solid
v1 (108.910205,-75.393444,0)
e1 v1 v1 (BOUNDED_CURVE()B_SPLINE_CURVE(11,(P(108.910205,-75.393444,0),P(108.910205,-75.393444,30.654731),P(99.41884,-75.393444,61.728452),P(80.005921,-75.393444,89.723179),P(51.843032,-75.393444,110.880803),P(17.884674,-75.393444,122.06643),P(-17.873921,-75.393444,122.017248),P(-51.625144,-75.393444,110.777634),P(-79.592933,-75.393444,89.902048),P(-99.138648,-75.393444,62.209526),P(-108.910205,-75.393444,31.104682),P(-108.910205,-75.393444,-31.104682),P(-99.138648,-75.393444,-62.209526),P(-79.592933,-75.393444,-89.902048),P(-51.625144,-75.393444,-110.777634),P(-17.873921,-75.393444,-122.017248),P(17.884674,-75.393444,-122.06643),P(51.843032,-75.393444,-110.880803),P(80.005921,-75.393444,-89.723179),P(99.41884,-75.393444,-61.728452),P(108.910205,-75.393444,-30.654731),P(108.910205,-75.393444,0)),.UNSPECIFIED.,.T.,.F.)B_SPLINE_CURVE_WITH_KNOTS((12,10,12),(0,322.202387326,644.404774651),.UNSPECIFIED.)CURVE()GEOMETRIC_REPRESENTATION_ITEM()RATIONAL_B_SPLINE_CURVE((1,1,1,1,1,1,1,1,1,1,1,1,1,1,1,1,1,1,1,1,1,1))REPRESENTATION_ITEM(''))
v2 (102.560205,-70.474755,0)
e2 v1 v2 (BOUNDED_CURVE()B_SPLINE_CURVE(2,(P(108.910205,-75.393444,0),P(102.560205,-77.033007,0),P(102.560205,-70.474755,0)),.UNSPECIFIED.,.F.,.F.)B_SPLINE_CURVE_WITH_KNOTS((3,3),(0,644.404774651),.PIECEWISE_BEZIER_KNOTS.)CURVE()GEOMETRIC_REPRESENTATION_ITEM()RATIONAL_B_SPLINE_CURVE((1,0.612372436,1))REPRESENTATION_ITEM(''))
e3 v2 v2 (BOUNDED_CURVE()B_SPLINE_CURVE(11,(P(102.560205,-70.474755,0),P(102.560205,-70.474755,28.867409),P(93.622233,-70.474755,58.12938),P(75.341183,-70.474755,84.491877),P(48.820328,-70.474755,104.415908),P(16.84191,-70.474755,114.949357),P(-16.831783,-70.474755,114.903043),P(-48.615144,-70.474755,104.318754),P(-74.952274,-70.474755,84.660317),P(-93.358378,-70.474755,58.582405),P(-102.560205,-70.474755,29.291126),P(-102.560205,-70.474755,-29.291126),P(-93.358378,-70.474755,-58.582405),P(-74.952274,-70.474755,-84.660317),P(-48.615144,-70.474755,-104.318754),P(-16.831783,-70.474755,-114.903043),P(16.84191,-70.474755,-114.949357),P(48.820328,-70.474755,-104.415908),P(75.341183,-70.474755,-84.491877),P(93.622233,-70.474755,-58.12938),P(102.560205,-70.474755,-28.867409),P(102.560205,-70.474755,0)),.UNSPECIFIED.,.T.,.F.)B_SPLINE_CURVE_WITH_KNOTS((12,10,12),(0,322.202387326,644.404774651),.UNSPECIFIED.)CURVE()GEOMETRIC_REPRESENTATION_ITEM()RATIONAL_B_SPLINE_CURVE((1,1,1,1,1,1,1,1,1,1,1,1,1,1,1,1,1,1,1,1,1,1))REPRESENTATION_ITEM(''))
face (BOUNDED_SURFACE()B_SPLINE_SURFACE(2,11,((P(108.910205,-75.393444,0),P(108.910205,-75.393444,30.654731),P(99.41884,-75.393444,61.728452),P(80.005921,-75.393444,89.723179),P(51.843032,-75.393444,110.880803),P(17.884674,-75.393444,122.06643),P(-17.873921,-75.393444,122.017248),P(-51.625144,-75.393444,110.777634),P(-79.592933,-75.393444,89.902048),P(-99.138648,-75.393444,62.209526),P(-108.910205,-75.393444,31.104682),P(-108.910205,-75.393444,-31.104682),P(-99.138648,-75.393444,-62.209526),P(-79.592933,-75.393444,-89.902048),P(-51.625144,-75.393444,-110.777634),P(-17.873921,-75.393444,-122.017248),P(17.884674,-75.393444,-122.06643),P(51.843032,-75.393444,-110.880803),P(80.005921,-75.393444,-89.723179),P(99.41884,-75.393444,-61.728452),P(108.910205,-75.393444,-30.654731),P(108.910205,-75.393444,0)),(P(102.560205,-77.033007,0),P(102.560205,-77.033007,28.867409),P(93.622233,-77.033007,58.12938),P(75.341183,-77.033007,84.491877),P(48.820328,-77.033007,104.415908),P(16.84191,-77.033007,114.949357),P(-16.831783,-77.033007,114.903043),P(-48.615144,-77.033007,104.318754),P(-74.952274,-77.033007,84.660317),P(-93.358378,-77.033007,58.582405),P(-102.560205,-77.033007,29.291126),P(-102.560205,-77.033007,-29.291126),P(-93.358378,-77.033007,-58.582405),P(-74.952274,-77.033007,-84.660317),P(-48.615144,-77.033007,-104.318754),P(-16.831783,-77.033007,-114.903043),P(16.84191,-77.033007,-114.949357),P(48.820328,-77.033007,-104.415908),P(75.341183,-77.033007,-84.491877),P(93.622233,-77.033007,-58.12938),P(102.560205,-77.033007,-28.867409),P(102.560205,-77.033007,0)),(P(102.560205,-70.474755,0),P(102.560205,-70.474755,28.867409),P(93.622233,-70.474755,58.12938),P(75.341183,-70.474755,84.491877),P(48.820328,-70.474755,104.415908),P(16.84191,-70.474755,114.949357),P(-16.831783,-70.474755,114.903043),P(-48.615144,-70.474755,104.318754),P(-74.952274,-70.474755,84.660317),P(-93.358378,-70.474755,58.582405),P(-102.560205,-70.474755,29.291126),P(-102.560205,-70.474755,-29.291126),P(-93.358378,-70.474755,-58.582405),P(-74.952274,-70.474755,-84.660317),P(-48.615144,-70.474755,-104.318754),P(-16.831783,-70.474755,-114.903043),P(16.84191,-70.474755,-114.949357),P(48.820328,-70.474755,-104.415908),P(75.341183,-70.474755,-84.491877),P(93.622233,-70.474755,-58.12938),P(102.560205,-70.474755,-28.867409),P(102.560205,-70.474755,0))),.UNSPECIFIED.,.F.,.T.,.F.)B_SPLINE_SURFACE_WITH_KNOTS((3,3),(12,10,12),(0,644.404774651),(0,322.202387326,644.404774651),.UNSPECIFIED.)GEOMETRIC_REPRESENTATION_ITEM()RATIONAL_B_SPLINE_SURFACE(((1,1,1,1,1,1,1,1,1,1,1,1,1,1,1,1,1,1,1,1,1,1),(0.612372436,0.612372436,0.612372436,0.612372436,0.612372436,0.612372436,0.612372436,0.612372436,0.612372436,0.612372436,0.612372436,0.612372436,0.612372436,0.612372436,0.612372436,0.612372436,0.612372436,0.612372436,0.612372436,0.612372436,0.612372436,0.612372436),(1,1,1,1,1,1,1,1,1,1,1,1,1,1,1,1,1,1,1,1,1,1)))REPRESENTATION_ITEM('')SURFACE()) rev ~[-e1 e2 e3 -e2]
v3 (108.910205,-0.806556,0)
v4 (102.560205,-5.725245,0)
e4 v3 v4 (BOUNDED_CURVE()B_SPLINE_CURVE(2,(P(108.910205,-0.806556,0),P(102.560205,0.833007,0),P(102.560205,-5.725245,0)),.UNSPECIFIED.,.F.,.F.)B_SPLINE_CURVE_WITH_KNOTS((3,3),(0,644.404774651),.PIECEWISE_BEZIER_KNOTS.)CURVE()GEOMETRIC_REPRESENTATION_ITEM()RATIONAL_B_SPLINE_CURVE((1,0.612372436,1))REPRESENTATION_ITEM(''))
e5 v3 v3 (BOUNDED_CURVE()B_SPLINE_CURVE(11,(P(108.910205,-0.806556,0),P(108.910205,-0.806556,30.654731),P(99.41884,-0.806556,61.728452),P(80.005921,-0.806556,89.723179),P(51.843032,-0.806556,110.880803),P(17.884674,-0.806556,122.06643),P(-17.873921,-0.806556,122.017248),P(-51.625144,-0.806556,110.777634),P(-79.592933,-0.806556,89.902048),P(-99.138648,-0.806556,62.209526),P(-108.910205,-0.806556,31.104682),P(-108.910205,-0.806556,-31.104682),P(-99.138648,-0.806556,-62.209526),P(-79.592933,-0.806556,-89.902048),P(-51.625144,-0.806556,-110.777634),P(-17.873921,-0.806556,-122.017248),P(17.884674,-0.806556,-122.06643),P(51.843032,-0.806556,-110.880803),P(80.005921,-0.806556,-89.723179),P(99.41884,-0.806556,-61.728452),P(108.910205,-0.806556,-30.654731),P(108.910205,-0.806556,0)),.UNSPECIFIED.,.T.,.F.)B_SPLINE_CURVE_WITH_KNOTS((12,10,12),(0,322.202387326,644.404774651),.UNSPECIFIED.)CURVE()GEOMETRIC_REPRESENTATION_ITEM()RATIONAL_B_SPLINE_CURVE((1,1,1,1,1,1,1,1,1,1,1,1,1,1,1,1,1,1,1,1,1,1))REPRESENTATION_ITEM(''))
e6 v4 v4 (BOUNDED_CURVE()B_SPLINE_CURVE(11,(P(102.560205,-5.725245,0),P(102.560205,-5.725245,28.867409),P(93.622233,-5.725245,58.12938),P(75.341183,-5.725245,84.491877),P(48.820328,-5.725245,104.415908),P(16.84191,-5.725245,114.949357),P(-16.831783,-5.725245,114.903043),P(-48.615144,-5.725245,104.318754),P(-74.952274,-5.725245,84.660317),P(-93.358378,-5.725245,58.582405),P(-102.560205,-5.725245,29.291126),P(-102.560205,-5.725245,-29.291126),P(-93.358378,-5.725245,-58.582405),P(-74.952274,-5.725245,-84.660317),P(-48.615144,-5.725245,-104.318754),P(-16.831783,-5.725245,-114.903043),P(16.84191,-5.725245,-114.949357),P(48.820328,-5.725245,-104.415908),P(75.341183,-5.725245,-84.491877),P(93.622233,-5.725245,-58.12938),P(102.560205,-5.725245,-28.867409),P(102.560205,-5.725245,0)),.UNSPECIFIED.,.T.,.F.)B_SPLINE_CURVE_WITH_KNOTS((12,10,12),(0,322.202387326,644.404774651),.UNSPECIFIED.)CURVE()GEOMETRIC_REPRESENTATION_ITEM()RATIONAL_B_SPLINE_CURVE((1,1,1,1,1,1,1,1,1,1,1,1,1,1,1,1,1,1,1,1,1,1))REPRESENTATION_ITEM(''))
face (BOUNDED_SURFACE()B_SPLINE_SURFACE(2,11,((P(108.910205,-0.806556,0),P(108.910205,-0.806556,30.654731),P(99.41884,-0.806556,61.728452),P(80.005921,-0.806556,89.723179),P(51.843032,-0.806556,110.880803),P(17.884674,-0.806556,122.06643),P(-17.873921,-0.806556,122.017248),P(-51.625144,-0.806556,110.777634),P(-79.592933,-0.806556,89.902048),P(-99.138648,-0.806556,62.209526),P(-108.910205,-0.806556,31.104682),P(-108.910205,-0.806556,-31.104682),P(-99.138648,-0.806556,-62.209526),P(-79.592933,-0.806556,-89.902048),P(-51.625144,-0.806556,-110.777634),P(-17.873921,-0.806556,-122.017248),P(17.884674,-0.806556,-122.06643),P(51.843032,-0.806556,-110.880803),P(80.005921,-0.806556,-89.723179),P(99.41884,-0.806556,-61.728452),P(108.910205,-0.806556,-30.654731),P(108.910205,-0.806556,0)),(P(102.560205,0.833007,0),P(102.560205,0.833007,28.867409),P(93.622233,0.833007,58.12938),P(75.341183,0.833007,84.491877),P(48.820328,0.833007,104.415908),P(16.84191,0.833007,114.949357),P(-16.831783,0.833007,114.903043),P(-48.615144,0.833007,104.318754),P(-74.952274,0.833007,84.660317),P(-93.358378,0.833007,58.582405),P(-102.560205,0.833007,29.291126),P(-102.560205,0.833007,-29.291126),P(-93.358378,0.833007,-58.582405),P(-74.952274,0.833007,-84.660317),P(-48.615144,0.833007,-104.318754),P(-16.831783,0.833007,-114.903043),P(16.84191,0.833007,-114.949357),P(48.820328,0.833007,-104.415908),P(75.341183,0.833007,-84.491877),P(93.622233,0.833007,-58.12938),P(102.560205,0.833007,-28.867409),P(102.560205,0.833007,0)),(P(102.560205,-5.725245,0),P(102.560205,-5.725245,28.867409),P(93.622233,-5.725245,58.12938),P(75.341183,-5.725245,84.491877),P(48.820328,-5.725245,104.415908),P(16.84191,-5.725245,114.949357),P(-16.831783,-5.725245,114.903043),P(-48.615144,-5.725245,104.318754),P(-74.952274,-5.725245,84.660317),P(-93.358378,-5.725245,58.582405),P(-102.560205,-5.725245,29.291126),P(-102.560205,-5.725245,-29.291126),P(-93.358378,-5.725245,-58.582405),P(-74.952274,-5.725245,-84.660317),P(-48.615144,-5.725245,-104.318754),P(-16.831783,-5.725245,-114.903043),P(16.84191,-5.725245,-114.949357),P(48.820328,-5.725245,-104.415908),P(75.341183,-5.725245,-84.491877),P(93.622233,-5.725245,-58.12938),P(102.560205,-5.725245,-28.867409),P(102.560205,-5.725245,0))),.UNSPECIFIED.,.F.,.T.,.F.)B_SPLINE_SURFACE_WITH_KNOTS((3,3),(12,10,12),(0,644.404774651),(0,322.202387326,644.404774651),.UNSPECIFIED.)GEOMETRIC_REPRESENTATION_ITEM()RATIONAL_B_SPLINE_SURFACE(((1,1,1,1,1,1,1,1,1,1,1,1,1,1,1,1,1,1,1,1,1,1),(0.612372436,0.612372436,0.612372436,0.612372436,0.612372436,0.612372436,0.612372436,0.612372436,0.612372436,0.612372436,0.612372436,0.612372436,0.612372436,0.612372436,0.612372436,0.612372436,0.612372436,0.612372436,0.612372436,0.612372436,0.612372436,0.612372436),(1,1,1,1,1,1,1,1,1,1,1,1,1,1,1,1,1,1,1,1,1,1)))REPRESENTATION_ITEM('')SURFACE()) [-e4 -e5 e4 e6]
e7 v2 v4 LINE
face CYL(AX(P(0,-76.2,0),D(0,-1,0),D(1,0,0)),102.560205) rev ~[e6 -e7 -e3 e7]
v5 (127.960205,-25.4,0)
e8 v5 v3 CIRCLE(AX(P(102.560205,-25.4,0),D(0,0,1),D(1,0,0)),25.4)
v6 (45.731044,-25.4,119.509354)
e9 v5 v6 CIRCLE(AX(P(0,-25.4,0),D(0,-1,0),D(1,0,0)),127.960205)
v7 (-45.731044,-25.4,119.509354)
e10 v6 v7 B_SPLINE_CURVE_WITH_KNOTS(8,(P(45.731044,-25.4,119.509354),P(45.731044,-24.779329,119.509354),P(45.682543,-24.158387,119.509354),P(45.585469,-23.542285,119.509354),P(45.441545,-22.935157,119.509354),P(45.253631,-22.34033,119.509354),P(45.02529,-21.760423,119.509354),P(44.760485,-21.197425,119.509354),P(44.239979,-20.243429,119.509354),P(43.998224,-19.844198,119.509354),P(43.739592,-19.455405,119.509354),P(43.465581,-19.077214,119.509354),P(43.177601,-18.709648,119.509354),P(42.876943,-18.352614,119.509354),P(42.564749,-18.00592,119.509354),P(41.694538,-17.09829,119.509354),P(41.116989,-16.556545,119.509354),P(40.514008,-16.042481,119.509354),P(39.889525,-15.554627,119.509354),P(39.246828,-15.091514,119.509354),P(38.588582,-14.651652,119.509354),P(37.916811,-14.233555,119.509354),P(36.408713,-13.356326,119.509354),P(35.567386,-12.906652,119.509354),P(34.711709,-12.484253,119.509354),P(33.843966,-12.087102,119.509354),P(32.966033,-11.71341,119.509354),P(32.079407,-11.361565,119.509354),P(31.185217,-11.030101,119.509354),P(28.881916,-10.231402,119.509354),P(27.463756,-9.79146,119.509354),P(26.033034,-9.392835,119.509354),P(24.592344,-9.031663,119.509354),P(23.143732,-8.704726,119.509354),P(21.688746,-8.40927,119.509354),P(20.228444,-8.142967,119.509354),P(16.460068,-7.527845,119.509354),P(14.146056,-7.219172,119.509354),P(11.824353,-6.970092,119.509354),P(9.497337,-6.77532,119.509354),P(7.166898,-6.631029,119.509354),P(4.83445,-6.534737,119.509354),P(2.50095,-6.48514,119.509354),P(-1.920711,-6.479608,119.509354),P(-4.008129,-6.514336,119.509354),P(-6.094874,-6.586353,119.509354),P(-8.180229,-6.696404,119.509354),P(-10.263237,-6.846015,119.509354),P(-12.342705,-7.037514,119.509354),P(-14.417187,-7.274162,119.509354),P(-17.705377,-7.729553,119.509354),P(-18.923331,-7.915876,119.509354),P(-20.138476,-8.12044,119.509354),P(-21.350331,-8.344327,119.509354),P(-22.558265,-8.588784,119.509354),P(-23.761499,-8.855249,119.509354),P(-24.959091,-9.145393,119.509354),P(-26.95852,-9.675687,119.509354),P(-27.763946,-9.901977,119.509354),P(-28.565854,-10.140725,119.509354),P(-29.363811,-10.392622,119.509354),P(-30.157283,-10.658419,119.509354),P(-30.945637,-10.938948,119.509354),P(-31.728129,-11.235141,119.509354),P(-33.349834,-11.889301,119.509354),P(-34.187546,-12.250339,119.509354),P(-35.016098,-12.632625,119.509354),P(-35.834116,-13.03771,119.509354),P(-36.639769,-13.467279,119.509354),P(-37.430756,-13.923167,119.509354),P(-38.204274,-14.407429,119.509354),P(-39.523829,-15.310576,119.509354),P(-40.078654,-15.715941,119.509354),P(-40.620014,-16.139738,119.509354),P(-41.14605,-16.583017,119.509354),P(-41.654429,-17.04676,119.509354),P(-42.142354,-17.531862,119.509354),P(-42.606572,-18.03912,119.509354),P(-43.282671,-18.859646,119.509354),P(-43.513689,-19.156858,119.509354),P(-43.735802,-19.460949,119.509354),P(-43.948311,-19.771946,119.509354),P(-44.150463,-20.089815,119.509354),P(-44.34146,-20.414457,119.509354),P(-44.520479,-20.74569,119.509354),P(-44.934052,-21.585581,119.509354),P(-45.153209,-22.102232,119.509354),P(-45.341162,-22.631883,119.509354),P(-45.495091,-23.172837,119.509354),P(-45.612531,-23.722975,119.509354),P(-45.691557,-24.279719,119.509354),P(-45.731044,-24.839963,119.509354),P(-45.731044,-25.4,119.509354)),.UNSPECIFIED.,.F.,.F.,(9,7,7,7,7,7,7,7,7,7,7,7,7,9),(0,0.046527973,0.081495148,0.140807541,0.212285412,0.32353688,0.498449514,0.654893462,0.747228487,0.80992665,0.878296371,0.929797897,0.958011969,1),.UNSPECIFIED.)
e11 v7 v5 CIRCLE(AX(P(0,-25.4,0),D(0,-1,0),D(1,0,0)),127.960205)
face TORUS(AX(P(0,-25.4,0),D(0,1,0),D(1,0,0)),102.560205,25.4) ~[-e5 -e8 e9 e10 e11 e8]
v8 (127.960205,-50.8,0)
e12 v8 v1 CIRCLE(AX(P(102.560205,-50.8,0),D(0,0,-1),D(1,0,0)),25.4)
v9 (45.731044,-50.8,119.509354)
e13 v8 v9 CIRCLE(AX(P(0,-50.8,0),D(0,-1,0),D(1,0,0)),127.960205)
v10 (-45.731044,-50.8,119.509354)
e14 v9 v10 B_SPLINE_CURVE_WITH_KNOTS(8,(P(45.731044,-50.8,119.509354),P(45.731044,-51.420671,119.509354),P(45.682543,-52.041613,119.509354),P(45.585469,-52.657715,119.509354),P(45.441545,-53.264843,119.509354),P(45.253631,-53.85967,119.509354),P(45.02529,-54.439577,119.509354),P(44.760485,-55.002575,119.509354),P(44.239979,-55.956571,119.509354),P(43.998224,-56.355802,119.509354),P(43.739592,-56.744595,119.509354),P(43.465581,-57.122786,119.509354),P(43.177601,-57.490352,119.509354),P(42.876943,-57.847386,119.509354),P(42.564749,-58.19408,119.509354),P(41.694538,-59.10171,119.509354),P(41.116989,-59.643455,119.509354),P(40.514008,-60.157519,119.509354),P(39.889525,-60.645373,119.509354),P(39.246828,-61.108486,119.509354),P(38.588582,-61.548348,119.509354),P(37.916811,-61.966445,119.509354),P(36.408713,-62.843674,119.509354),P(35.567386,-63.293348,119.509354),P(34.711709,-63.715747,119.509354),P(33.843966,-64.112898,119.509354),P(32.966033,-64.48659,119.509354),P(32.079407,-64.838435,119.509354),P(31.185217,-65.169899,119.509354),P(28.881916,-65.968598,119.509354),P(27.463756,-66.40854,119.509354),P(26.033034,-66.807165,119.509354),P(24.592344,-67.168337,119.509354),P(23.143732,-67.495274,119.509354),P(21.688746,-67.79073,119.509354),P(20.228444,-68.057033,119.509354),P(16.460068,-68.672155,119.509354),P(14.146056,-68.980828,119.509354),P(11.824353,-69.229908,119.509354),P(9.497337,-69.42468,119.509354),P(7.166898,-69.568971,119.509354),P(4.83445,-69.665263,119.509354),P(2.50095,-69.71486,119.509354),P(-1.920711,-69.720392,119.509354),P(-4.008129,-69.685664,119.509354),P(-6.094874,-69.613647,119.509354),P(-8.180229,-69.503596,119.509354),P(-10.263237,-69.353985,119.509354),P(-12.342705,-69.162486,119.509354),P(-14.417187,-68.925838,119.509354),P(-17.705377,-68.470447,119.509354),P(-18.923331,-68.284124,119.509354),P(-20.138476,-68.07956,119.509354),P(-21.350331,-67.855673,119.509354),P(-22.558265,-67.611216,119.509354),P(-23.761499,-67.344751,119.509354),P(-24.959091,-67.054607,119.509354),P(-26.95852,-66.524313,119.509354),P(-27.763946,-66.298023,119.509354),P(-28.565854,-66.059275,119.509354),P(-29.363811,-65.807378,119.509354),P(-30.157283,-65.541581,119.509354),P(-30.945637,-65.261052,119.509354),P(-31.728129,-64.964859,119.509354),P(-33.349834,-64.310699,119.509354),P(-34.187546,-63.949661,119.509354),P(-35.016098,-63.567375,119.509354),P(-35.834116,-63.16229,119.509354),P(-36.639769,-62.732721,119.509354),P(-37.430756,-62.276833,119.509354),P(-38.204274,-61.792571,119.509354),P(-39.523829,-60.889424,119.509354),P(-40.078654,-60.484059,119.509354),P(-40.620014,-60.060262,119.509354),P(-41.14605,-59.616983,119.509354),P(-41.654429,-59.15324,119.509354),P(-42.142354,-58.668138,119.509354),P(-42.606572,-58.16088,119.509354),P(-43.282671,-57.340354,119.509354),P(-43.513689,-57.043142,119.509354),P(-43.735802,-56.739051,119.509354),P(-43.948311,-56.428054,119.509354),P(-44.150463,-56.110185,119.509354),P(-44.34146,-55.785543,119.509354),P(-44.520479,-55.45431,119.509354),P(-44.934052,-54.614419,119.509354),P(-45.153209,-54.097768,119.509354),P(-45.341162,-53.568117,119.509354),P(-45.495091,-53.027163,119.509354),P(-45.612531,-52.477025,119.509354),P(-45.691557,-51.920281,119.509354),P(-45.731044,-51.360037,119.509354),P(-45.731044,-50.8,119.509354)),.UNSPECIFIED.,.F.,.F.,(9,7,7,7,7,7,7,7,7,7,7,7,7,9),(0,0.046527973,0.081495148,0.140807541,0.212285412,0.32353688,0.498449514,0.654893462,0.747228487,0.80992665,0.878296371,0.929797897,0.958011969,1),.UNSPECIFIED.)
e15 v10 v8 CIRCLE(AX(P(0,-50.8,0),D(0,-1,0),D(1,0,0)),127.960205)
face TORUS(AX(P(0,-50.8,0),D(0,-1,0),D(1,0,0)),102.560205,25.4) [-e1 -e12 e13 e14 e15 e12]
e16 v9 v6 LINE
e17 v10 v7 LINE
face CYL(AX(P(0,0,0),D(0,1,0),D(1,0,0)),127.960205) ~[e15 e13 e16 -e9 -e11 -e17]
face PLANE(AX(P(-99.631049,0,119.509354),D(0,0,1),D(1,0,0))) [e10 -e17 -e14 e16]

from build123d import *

# Parameters (mm, degrees)
F0_R     = 127.9602052378
F1_DEPTH = 76.2
F2_R     = 25.4
F3_DEPTH = 101.6
F4_R     = 5.08
F5_W     = 206.9260179996
F5_H     = 31.6136926413
F6_DEPTH = 101.6


with BuildPart() as f1:
    # F0 (on Front) → F1 (new body)
    with BuildSketch(Plane.XZ):
        Circle(F0_R)
    extrude(amount=F1_DEPTH)

    # F2
    f2_edges = [f1.edges().sort_by_distance(p)[0] for p in [
        (-127.960205, -76.2, 0),
        (-127.960205, 0, 0),
    ]]
    fillet(f2_edges, radius=F2_R)

    # F3 (cut): a face of the model
    f3_faces = [f1.faces().sort_by_distance(p)[0] for p in [
        (0, -76.2, 0),
    ]]
    extrude(f3_faces, amount=-F3_DEPTH, mode=Mode.SUBTRACT)

    # F4
    f4_edges = [f1.edges().sort_by_distance(p)[0] for p in [
        (127.960205, -38.1, 0),
        (-127.960205, -25.4, 0),
        (-127.960205, -50.8, 0),
        (-102.560205, 0, 0),
        (-102.560205, -76.2, 0),
    ]]
    fillet(f4_edges, radius=F4_R)

    # F5 (on Front) → F6 (cut)
    with BuildSketch(Plane.XZ):
        with Locations((3.8319602609, 135.3162005544)):
            Rectangle(F5_W, F5_H)
    extrude(amount=F6_DEPTH, mode=Mode.SUBTRACT)


solid = f1.part
